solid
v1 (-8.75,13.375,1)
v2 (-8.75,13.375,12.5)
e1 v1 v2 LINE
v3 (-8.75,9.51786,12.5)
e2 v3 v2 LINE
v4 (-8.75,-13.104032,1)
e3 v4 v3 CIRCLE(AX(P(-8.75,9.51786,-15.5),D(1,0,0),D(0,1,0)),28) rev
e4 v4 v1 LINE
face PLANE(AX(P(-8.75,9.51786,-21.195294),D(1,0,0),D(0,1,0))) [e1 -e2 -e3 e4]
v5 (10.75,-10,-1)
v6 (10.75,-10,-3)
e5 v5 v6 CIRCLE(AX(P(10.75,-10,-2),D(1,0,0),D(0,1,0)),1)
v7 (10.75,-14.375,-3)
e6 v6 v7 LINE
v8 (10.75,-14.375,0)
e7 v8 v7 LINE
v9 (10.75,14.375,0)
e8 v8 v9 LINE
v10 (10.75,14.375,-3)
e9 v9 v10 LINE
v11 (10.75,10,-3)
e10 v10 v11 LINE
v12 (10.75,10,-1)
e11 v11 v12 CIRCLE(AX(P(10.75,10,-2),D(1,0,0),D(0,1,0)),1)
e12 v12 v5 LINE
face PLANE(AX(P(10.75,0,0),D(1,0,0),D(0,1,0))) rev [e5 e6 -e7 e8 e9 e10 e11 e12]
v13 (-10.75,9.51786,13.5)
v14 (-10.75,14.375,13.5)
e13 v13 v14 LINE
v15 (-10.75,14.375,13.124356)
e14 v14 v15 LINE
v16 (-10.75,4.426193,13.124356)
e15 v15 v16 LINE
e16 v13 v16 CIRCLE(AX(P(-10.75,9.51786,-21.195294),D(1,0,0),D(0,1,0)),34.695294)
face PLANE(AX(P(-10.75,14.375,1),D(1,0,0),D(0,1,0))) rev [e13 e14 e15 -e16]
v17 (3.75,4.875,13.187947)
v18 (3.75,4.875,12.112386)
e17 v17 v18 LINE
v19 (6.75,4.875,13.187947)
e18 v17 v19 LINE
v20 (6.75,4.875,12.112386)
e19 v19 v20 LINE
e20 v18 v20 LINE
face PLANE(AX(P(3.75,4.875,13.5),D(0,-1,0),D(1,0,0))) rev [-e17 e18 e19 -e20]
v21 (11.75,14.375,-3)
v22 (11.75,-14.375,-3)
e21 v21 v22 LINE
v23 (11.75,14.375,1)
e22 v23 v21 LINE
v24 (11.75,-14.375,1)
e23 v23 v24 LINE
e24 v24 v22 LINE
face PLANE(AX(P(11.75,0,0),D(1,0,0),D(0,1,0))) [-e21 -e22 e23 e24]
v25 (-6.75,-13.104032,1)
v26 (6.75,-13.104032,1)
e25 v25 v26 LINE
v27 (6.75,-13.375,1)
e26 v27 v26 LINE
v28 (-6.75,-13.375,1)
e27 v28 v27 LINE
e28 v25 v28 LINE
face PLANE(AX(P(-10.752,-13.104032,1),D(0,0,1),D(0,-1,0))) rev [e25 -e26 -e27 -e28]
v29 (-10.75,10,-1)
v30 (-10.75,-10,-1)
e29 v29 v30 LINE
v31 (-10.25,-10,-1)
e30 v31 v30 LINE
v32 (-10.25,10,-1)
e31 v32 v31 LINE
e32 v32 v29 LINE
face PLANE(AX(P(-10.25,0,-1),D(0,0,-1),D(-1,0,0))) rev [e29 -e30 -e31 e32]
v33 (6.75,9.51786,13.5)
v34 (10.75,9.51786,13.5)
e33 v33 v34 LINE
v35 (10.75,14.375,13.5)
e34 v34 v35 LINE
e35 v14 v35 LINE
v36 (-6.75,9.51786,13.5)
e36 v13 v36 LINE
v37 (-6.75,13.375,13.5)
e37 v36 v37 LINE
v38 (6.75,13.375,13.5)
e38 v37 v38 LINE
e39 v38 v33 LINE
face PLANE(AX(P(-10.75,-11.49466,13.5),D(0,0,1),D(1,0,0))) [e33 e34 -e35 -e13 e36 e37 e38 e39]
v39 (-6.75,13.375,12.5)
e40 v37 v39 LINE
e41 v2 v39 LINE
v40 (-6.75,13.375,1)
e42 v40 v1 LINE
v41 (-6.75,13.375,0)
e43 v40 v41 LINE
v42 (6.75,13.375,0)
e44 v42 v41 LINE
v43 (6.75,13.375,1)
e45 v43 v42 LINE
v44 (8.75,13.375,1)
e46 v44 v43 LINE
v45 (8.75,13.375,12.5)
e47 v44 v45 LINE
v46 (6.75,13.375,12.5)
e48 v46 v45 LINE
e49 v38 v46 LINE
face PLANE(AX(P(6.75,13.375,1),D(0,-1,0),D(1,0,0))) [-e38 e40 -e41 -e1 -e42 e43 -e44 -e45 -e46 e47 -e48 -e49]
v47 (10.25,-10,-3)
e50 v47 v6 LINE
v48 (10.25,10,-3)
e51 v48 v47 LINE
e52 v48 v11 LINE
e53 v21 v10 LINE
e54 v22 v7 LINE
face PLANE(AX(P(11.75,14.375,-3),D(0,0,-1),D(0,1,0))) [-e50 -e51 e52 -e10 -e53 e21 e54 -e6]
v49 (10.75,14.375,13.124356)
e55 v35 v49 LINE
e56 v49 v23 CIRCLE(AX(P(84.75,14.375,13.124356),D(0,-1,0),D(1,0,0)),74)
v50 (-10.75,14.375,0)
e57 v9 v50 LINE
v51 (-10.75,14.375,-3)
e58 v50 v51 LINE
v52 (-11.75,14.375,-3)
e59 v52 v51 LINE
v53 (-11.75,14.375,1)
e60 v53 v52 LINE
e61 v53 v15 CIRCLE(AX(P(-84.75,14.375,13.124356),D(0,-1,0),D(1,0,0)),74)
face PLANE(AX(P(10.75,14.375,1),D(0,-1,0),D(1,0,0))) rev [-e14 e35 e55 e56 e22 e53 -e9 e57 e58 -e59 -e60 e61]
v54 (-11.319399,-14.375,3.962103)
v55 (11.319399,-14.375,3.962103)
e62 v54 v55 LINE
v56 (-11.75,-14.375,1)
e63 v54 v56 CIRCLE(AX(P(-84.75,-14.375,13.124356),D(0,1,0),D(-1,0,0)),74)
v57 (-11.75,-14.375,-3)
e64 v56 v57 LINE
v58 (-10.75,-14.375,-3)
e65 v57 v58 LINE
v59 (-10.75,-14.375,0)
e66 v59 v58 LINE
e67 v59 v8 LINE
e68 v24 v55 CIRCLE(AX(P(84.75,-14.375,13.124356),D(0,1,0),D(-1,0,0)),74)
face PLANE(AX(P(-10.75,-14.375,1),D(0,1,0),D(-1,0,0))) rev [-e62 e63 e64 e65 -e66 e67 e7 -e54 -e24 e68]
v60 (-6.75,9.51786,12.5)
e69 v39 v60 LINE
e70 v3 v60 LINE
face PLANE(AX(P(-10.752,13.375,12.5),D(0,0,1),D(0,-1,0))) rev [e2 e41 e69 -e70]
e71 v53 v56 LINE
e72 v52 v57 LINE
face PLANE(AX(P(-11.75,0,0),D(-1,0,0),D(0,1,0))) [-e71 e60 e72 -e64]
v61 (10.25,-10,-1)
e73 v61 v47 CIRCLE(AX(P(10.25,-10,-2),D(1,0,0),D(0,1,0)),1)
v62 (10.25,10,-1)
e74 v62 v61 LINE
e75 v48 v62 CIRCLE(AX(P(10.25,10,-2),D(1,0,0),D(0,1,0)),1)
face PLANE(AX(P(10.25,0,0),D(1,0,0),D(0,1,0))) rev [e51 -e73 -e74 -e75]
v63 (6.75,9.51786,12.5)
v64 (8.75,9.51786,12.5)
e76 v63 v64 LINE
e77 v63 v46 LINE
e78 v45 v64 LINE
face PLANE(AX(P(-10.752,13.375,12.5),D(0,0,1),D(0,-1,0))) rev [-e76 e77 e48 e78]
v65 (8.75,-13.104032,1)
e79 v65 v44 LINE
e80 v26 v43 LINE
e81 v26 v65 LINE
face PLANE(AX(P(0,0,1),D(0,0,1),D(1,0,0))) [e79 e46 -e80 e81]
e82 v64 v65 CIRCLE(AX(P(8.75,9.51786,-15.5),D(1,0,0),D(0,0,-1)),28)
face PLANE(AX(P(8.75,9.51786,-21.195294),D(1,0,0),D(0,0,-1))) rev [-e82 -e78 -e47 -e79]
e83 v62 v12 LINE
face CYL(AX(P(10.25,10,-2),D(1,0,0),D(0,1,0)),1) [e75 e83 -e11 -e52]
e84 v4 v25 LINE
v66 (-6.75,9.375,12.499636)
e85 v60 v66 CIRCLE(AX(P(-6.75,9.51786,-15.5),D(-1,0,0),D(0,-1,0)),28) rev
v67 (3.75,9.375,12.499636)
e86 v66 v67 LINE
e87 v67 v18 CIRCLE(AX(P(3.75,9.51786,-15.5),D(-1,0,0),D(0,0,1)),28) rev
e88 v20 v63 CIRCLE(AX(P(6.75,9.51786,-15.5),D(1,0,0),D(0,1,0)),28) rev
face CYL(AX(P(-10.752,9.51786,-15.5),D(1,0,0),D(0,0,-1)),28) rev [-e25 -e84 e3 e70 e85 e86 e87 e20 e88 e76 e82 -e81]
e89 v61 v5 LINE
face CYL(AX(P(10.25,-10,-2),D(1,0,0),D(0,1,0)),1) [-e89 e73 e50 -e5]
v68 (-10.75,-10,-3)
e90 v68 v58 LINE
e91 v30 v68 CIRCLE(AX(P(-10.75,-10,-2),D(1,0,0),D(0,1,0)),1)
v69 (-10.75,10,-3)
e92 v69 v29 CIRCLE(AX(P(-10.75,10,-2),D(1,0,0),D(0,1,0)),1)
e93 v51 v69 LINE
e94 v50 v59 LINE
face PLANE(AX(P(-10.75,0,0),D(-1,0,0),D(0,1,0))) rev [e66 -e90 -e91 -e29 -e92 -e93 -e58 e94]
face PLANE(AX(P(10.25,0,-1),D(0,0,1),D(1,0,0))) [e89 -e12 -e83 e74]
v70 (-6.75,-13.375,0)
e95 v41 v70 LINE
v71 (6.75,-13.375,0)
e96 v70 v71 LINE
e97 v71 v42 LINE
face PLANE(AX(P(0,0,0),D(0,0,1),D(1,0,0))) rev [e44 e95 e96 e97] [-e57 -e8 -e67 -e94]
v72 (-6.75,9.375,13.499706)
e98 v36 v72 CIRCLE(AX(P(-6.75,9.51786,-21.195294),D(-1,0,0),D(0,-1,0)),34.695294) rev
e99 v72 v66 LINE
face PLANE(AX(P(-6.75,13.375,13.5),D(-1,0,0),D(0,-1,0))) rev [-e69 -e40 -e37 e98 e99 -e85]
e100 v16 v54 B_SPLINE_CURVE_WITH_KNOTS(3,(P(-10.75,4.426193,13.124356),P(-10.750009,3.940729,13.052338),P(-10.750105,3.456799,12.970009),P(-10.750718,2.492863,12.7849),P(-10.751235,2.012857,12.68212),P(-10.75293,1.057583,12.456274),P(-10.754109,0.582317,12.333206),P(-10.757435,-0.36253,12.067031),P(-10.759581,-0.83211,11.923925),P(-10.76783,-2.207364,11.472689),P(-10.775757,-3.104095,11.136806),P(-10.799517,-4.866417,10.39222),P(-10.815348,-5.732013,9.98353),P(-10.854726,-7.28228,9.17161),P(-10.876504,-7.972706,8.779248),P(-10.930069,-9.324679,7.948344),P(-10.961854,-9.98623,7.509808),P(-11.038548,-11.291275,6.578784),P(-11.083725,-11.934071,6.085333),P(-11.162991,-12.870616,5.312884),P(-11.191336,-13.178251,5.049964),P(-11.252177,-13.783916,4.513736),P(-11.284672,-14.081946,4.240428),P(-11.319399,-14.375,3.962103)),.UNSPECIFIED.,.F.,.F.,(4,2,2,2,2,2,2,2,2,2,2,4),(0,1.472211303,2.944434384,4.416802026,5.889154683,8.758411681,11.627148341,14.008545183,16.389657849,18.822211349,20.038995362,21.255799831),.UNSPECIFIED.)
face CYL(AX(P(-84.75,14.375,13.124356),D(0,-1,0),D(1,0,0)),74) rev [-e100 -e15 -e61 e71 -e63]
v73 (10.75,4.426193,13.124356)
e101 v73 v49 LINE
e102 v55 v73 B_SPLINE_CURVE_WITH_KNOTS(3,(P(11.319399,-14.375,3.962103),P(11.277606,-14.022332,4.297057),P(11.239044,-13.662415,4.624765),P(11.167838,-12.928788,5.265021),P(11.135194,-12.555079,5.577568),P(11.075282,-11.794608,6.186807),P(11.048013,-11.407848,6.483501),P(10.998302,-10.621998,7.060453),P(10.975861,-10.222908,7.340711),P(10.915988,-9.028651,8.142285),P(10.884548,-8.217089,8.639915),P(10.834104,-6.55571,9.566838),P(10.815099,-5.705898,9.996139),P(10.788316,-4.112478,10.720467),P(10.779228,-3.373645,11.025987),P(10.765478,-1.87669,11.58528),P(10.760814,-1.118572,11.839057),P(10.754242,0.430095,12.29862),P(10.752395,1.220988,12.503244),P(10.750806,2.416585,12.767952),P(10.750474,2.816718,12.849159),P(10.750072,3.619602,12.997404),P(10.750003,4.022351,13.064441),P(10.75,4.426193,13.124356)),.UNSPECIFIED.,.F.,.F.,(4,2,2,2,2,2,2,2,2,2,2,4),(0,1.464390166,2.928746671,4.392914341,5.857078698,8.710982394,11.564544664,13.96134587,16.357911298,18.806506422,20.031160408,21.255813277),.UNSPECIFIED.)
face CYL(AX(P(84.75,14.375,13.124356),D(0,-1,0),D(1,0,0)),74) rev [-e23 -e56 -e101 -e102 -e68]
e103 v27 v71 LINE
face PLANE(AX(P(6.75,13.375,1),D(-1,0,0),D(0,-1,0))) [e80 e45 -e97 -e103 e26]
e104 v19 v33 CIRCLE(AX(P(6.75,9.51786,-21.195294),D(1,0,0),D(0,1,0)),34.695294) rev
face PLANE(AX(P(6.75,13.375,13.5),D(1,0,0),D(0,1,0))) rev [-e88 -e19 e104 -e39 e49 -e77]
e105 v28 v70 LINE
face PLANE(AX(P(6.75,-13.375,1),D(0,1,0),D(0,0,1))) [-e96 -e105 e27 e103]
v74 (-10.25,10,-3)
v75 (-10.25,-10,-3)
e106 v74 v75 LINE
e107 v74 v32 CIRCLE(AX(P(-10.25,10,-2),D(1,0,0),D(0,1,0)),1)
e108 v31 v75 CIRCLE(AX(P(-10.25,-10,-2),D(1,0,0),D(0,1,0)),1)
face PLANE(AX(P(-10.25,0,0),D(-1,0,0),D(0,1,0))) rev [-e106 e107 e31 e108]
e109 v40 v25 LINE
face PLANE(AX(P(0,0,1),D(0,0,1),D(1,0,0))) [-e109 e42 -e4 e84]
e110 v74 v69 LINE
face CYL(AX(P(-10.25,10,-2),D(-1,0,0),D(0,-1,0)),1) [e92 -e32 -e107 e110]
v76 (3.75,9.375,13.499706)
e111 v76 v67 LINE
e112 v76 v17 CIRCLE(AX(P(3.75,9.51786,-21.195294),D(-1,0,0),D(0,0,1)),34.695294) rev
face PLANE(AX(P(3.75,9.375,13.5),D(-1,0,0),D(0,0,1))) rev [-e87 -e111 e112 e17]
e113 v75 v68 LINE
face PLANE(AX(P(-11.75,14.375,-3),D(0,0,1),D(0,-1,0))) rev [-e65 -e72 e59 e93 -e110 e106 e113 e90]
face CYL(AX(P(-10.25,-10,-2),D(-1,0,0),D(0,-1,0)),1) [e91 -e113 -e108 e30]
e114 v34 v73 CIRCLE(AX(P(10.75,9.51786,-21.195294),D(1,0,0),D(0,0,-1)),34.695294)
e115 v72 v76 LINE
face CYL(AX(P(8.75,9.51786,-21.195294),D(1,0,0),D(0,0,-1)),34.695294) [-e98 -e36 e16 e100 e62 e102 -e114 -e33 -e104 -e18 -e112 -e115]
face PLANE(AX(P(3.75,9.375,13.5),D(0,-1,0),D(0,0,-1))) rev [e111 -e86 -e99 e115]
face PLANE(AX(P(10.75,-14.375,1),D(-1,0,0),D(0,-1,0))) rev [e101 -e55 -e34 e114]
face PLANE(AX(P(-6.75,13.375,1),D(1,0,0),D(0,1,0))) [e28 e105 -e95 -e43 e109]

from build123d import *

# Parameters (mm, degrees)
SKETCH1_W           = 21.5
SKETCH1_H           = 28.75
SKETCH1_W_2         = 13.5
SKETCH1_H_2         = 26.75
BOSS_EXTRUDE1_DEPTH = 1
SKETCH3_W           = 21.5
SKETCH3_H           = 12.5
BOSS_EXTRUDE2_DEPTH = 1
BOSS_EXTRUDE3_DEPTH = 2
BOSS_EXTRUDE4_START = -19.5
BOSS_EXTRUDE4_DEPTH = 2
BOSS_EXTRUDE5_REACH = 29.733
CUT_EXTRUDE1_DEPTH  = 23.460033949
SKETCH7_W           = 4
SKETCH7_H           = 28.75
BOSS_EXTRUDE8_DEPTH = 1
BOSS_EXTRUDE9_DEPTH = 0.5
FILLET2_R           = 74


with BuildPart() as part:
    # Sketch1 → Boss-Extrude1 (new body)
    with BuildSketch(Plane.XY):
        Rectangle(SKETCH1_W, SKETCH1_H)
        Rectangle(SKETCH1_W_2, SKETCH1_H_2, mode=Mode.SUBTRACT)
    extrude(amount=BOSS_EXTRUDE1_DEPTH)

    # Sketch3 → Boss-Extrude2 (add)
    with BuildSketch(Plane(origin=(0, 14.375, 0), x_dir=(1, 0, 0), z_dir=(0, 1, 0))):
        with Locations((0, -7.25)):
            Rectangle(SKETCH3_W, SKETCH3_H)
    extrude(amount=-BOSS_EXTRUDE2_DEPTH)

    # Sketch4 → Boss-Extrude3 (add)
    with BuildSketch(Plane(origin=(10.75, 0, 0), x_dir=(0, 0, -1), z_dir=(1, 0, 0))):
        with BuildLine():
            Line((-13.5, 13.375), (-13.5, 9.51786033))
            ThreePointArc((-13.5, 9.51786033), (-11.027421028, -3.345267641), (-3.962103479, -14.375))
            Line((-3.962103479, -14.375), (-1, -14.375))
            Line((-1, -14.375), (-1, 13.375))
            Line((-1, 13.375), (-13.5, 13.375))
        make_face()
    extrude(amount=-BOSS_EXTRUDE3_DEPTH)

    # Sketch4<2> → Boss-Extrude4 (add)
    with BuildSketch(Plane(origin=(10.75, 0, 0), x_dir=(0, 0, -1), z_dir=(1, 0, 0)).offset(BOSS_EXTRUDE4_START)):
        with BuildLine():
            Line((-13.5, 13.375), (-13.5, 9.51786033))
            ThreePointArc((-13.5, 9.51786033), (-11.027421028, -3.345267641), (-3.962103479, -14.375))
            Line((-3.962103479, -14.375), (-1, -14.375))
            Line((-1, -14.375), (-1, 13.375))
            Line((-1, 13.375), (-13.5, 13.375))
        make_face()
    extrude(amount=-BOSS_EXTRUDE4_DEPTH)

    # Sketch5 → Boss-Extrude5 (add, up to next)
    with BuildSketch(Plane.ZY.offset(-8.75), mode=Mode.PRIVATE) as boss_extrude5_sk1:
        with BuildLine():
            Line((12.5, 13.375), (13.5, 13.375))
            Line((13.5, 13.375), (13.5, 9.51786033))
            ThreePointArc((13.5, 9.51786033), (11.027421028, -3.345267641), (3.962103479, -14.375))
            Line((3.962103479, -14.375), (1, -14.375))
            Line((1, -14.375), (1, -13.104031722))
            ThreePointArc((1, -13.104031722), (9.459967949, -3.17071721), (12.5, 9.51786033))
            Line((12.5, 9.51786033), (12.5, 13.375))
        make_face()
    boss_extrude5_tool1 = extrude(boss_extrude5_sk1.sketch, amount=BOSS_EXTRUDE5_REACH, mode=Mode.PRIVATE) - part.part
    add(boss_extrude5_tool1.solids().sort_by_distance((8.75, -14.070646, 2.481052))[0])

    # Sketch6 → Cut-Extrude1 (cut, through all)
    with BuildSketch(Plane(origin=(0, 0, 0), x_dir=(-1, 0, 0), z_dir=(0, 0, -1))):
        Polygon((-6.75, 13.375), (6.75, 13.375), (6.75, 9.375), (-3.75, 9.375), (-3.75, 4.875), (-6.75, 4.875), align=None)
    extrude(amount=-CUT_EXTRUDE1_DEPTH, mode=Mode.SUBTRACT)

    # Sketch7 → Boss-Extrude8 (add)
    with BuildSketch(Plane(origin=(10.75, 0, 0), x_dir=(0, 0, -1), z_dir=(1, 0, 0))):
        with Locations((1, 0)):
            Rectangle(SKETCH7_W, SKETCH7_H)
    boss_extrude8 = extrude(amount=BOSS_EXTRUDE8_DEPTH)

    # Sketch7<5> → Boss-Extrude9 (add)
    with BuildSketch(Plane(origin=(10.75, 0, 0), x_dir=(0, 0, -1), z_dir=(1, 0, 0))):
        with BuildLine():
            Line((3, -10), (3, 10))
            ThreePointArc((3, 10), (2, 11), (1, 10))
            Line((1, 10), (1, -10))
            ThreePointArc((1, -10), (2, -11), (3, -10))
        make_face()
    boss_extrude9 = extrude(amount=-BOSS_EXTRUDE9_DEPTH)

    # Mirror3: Boss-Extrude8, Boss-Extrude9 across plane
    add(boss_extrude8.mirror(Plane(origin=(0, 0, 0), x_dir=(0, 0, 1), z_dir=(1, 0, 0))))
    add(boss_extrude9.mirror(Plane(origin=(0, 0, 0), x_dir=(0, 0, 1), z_dir=(1, 0, 0))))

    # Fillet2
    # the kernel refuses this fillet: 74 mm, written as the material it adds along each edge
    with BuildSketch(Plane(origin=(10.75, -14.375, 1), x_dir=(0, 0, 1), z_dir=(0, 1, 0))) as fillet2_piece_1_section:
        with BuildLine():
            CenterArc((12.124355653, 74), FILLET2_R, 260.569992092, 9.430007908)
            Line((0, 1), (0, 0))
            Line((0, 0), (12.124355653, 0))
        make_face()
    fillet2_piece_1 = extrude(amount=28.75, mode=Mode.PRIVATE)
    fillet2_piece_1 = fillet2_piece_1 & Plane(origin=(10.75, 9.51786033, -21.195293839), x_dir=(0, 0, 1), z_dir=(1, 0, 0)) * Cylinder(34.695293839, 106, mode=Mode.PRIVATE)
    add(fillet2_piece_1)
    with BuildSketch(Plane(origin=(-10.75, -14.375, 1), x_dir=(0, 0, 1), z_dir=(0, 1, 0))) as fillet2_piece_2_section:
        with BuildLine():
            CenterArc((12.124355653, -74), FILLET2_R, 90, 9.430007908)
            Line((0, -1), (0, 0))
            Line((0, 0), (12.124355653, 0))
        make_face()
    fillet2_piece_2 = extrude(amount=28.75, mode=Mode.PRIVATE)
    fillet2_piece_2 = fillet2_piece_2 & Plane(origin=(-10.75, 9.51786033, -21.195293839), x_dir=(0, 0, 1), z_dir=(1, 0, 0)) * Cylinder(34.695293839, 106, mode=Mode.PRIVATE)
    add(fillet2_piece_2)


solid = part.part
